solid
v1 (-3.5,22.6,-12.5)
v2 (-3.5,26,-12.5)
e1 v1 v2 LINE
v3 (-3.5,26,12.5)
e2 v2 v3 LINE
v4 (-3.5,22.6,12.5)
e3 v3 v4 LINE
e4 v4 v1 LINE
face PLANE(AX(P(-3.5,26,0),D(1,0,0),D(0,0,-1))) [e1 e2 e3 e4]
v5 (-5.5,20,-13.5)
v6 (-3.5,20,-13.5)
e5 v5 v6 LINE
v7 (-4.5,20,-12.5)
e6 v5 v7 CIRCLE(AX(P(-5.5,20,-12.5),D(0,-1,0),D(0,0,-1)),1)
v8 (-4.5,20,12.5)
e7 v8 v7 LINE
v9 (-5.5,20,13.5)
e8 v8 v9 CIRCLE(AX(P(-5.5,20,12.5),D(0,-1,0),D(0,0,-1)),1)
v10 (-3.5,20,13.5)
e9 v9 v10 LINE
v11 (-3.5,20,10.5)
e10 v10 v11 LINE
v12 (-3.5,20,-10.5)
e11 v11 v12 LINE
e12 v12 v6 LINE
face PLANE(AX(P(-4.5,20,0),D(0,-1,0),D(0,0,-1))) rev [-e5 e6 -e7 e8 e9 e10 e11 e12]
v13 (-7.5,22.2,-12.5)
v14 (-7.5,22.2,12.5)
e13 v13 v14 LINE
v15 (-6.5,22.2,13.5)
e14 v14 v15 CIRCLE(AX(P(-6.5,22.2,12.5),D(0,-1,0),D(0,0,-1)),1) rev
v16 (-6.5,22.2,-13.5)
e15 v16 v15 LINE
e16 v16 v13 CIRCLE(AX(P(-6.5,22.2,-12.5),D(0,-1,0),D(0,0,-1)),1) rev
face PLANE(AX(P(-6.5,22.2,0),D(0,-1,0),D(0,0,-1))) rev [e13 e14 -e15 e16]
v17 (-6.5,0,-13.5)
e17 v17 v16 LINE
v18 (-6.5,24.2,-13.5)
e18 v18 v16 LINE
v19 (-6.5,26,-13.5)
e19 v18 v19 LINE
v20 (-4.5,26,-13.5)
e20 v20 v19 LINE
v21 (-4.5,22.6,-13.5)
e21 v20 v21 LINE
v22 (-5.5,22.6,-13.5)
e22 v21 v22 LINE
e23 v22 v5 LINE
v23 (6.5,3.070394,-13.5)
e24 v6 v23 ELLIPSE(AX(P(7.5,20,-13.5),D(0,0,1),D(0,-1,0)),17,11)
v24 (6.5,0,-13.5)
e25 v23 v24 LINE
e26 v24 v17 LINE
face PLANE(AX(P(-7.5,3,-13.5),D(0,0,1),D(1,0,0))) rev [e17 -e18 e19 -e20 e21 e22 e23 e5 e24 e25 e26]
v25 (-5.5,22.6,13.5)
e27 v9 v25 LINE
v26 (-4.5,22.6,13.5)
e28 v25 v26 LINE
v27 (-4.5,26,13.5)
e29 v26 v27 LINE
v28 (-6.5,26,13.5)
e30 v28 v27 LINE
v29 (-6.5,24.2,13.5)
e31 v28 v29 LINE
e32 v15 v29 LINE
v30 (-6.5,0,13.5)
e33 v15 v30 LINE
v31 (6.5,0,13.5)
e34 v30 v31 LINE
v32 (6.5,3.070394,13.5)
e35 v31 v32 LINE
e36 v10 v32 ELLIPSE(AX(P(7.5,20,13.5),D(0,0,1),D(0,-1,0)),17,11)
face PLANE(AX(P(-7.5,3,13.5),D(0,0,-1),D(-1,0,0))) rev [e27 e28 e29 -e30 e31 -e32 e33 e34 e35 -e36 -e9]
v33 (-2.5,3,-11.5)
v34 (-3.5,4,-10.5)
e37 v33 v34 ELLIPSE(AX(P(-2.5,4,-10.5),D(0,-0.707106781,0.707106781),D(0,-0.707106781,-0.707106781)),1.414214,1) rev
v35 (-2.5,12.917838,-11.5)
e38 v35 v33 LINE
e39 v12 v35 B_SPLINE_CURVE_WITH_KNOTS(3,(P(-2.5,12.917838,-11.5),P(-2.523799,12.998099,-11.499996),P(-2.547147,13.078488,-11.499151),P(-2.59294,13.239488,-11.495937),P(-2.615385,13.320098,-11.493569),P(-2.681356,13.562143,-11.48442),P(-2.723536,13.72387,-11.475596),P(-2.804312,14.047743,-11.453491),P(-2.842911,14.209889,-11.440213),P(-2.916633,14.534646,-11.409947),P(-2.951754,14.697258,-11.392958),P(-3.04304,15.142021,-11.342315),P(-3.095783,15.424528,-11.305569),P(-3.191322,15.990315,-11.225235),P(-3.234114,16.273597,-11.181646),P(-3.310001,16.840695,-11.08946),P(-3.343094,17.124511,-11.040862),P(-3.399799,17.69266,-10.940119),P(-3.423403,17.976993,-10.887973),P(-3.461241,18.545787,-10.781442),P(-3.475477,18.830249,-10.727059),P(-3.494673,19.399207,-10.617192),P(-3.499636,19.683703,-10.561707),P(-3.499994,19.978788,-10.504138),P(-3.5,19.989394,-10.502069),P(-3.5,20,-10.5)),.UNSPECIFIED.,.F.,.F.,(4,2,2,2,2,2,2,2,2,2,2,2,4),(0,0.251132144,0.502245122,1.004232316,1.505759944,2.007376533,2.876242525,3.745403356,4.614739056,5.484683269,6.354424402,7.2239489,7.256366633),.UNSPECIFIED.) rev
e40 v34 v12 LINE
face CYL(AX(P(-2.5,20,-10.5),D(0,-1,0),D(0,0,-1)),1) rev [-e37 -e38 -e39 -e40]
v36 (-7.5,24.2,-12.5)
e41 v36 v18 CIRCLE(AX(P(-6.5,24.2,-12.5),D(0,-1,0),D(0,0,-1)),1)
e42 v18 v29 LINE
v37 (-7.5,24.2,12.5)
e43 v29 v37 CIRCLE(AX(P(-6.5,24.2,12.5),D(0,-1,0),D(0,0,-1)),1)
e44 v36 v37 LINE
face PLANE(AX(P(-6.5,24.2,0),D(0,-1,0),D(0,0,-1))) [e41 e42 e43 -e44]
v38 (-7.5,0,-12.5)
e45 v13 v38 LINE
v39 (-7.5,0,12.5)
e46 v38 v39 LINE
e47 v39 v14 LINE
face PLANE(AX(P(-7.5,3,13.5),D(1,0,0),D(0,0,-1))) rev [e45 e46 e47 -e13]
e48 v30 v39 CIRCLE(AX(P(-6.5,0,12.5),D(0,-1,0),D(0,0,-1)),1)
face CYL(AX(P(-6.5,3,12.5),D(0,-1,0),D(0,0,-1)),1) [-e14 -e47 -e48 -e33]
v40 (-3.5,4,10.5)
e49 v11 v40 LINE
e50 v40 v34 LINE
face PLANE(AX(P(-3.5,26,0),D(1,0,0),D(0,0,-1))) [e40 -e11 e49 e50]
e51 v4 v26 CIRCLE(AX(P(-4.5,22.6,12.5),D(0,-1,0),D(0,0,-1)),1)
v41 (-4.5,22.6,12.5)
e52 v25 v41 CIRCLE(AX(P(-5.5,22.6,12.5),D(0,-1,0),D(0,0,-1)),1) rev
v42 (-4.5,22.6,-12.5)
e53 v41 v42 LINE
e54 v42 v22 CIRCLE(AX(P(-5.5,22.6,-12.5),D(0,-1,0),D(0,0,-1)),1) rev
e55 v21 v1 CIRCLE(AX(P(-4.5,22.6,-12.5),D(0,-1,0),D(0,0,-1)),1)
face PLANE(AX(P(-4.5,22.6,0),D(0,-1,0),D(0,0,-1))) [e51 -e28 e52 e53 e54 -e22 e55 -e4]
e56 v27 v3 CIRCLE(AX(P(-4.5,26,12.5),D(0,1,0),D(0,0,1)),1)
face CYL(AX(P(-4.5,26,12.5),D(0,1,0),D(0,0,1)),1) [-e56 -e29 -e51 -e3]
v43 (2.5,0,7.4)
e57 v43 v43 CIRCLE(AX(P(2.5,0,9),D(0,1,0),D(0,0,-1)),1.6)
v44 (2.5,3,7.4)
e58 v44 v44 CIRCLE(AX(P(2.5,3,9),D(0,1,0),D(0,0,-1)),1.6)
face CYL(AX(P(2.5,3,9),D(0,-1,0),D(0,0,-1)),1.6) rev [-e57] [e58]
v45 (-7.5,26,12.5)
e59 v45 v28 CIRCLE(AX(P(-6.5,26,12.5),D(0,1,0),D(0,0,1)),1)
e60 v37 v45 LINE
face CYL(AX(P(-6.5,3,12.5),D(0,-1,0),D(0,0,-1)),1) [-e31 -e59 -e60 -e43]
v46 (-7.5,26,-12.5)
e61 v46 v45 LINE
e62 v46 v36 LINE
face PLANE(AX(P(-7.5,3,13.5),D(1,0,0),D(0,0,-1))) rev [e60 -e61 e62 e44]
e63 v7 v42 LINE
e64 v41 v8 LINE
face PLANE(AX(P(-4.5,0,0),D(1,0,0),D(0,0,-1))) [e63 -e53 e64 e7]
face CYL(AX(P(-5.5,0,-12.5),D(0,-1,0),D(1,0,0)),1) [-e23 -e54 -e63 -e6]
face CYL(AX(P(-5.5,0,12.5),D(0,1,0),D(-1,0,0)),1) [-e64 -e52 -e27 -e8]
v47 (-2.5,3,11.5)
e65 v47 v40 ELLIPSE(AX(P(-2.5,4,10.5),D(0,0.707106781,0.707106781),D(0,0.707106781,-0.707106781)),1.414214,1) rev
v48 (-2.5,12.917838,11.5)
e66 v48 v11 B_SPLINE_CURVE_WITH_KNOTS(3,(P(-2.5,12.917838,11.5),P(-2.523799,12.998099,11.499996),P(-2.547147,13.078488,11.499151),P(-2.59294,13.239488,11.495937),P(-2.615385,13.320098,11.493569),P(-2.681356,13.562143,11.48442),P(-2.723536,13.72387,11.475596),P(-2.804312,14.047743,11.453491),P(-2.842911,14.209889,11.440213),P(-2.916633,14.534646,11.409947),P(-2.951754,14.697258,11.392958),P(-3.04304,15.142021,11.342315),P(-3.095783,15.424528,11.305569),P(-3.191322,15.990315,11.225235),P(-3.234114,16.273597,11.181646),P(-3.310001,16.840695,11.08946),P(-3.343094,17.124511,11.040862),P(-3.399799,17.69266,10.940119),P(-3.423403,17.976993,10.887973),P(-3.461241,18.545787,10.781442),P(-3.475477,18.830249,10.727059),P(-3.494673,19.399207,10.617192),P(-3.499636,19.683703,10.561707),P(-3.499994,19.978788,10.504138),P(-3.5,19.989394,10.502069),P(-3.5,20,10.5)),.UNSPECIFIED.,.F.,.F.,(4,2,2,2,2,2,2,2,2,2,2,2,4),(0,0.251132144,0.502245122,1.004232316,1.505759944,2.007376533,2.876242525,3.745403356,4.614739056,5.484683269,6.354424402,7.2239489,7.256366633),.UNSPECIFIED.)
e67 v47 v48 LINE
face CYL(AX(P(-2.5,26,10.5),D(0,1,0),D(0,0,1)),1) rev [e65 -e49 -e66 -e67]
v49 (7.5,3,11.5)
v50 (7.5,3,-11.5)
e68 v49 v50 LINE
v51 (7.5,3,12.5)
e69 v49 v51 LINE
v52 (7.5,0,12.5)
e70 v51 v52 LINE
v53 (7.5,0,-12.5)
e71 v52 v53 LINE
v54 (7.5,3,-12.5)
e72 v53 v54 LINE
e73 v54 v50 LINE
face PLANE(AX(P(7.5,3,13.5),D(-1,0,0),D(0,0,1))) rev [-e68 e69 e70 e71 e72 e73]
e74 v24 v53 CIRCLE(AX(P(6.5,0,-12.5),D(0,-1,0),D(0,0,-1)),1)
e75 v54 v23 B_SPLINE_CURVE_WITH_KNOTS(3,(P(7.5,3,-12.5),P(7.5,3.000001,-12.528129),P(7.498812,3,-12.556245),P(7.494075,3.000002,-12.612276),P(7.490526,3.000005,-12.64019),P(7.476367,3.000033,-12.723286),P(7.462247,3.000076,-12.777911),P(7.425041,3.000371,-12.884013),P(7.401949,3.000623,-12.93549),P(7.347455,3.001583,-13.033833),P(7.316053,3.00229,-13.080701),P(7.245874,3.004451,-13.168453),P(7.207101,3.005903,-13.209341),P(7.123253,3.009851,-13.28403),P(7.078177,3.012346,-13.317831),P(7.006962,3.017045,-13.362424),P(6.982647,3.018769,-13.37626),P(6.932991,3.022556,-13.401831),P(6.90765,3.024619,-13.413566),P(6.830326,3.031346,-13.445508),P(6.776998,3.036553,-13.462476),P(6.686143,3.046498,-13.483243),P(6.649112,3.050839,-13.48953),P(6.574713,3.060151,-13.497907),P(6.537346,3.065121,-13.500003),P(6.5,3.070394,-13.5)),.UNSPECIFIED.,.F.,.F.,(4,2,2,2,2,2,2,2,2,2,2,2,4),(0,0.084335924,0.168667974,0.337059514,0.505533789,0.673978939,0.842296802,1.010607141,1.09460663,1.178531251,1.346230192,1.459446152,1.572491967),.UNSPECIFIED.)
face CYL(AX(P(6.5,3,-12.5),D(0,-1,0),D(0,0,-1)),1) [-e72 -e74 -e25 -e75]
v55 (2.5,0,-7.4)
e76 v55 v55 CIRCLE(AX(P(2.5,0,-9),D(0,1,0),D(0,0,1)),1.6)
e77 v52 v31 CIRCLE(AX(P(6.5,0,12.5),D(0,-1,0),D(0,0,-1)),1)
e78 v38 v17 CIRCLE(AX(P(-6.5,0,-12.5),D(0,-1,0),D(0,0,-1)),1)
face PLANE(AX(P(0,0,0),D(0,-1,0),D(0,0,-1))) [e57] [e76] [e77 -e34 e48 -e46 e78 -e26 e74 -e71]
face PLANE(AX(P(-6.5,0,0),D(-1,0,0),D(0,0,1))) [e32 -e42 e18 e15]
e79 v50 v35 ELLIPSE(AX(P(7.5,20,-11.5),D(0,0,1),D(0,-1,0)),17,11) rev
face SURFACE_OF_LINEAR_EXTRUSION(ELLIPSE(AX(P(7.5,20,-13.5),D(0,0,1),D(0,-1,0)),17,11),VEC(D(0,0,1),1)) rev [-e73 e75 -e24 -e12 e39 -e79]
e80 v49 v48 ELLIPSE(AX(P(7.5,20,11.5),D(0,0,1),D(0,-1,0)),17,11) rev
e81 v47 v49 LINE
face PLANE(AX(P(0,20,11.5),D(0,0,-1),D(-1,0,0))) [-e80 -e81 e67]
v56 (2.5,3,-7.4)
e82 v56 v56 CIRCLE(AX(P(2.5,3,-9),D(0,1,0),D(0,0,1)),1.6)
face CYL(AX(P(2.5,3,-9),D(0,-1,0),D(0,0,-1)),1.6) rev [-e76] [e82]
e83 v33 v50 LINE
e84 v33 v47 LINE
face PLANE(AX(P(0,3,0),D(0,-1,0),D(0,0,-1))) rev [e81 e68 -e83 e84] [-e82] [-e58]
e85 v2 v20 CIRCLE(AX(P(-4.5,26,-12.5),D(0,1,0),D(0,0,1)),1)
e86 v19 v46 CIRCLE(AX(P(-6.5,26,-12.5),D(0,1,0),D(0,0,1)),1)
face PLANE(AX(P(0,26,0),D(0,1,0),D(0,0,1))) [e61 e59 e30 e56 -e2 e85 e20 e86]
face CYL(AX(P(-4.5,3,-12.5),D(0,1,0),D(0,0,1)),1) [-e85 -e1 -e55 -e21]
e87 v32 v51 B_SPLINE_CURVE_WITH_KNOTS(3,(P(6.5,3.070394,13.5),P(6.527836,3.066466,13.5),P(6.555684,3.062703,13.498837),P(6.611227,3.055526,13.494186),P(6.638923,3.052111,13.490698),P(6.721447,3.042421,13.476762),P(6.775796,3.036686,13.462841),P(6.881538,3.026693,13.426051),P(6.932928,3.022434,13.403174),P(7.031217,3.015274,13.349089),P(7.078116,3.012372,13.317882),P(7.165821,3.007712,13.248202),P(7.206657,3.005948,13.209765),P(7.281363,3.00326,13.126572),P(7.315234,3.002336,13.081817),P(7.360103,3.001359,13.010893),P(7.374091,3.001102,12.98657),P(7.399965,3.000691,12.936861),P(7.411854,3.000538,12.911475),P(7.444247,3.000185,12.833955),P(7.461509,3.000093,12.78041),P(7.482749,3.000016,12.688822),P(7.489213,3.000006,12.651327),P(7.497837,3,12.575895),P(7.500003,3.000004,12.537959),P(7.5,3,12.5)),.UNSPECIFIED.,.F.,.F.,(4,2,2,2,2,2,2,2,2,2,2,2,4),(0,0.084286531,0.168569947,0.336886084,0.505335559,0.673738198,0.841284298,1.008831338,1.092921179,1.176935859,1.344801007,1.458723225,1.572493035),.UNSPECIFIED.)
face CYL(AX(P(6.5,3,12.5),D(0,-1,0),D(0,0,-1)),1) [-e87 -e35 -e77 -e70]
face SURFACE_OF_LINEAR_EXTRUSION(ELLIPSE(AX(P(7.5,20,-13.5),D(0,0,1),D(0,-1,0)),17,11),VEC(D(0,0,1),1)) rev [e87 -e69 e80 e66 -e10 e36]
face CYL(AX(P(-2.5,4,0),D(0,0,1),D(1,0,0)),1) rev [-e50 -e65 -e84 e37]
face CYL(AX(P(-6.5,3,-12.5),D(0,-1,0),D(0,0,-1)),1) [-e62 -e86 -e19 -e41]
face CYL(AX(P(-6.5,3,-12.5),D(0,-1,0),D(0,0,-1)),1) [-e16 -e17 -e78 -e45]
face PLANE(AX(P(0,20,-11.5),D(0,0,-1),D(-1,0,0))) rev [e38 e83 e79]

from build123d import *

# Parameters (mm, degrees)
SKETCH1_W               = 15
SKETCH1_H               = 27
SKETCH1_R               = 1.6
BOSS_EXTRUDE1_DEPTH     = 3
SKETCH2_W               = 4
SKETCH2_H               = 27
BOSS_EXTRUDE2_DEPTH     = 23
SKETCH3_W               = 27
SKETCH3_H               = 2
CUT_EXTRUDE1_DEPTH      = 1
SKETCH4_W               = 27
SKETCH4_H               = 2.6
CUT_EXTRUDE2_DEPTH      = 1
SKETCH5_W               = 11
SKETCH5_H               = 2
BOSS_EXTRUDE3_DEPTH     = 17
CUT_EXTRUDE3_DEPTH      = 37.84087404
CUT_EXTRUDE3_DEPTH_BACK = 37.84087404
SKETCH7_RX              = 17
SKETCH7_RY              = 11
FILLET2_R               = 1
FILLET3_START           = -11.5
FILLET3_DEPTH           = 23
FILLET3_START_2         = 2
FILLET3_2_DEPTH         = 18
FILLET3_3_DEPTH         = 23


with BuildPart() as part:
    # Sketch1 → Boss-Extrude1 (new body)
    with BuildSketch(Plane(origin=(0, 0, 0), x_dir=(1, 0, 0), z_dir=(0, 1, 0))):
        Rectangle(SKETCH1_W, SKETCH1_H)
        with Locations(Location((2.5, 9, 0), (0, 0, 270))):
            Circle(SKETCH1_R, mode=Mode.SUBTRACT)
        with Locations(Location((2.5, -9, 0), (0, 0, 90))):
            Circle(SKETCH1_R, mode=Mode.SUBTRACT)
    extrude(amount=BOSS_EXTRUDE1_DEPTH)

    # Sketch2 → Boss-Extrude2 (add)
    with BuildSketch(Plane(origin=(0, 3, 0), x_dir=(1, 0, 0), z_dir=(0, 1, 0))):
        with Locations((-5.5, 0)):
            Rectangle(SKETCH2_W, SKETCH2_H)
    extrude(amount=BOSS_EXTRUDE2_DEPTH)

    # Sketch3 → Cut-Extrude1 (cut)
    with BuildSketch(Plane.ZY.offset(7.5)):
        with Locations((0, 23.2)):
            Rectangle(SKETCH3_W, SKETCH3_H)
    extrude(amount=-CUT_EXTRUDE1_DEPTH, mode=Mode.SUBTRACT)

    # Sketch4 → Cut-Extrude2 (cut)
    with BuildSketch(Plane(origin=(-3.5, 0, 0), x_dir=(0, 0, -1), z_dir=(1, 0, 0))):
        with Locations((0, 21.3)):
            Rectangle(SKETCH4_W, SKETCH4_H)
    extrude(amount=-CUT_EXTRUDE2_DEPTH, mode=Mode.SUBTRACT)

    # Sketch5 → Boss-Extrude3 (add)
    with BuildSketch(Plane(origin=(0, 3, 0), x_dir=(1, 0, 0), z_dir=(0, 1, 0))):
        with Locations((2, 12.5)):
            Rectangle(SKETCH5_W, SKETCH5_H)
        with Locations((2, -12.5)):
            Rectangle(SKETCH5_W, SKETCH5_H)
    extrude(amount=BOSS_EXTRUDE3_DEPTH)

    # Sketch7 → Cut-Extrude3 (cut, two sides: drawn at the far end of the back side and taken through both)
    with BuildSketch(Plane.XY.offset(-11.5).offset(-CUT_EXTRUDE3_DEPTH_BACK)):
        with Locations(Location((7.5, 20), (0, 0, 90))):
            Ellipse(SKETCH7_RX, SKETCH7_RY)
    extrude(amount=CUT_EXTRUDE3_DEPTH + CUT_EXTRUDE3_DEPTH_BACK, mode=Mode.SUBTRACT)

    # Fillet2
    fillet2_edges = [part.edges().sort_by_distance(p)[0] for p in [
        (-7.5, 25.1, 13.5),
        (-7.5, 11.1, 13.5),
        (7.5, 1.5, 13.5),
        (-4.5, 21.3, 13.5),
        (-3.5, 24.3, 13.5),
        (-7.5, 25.1, -13.5),
        (-7.5, 11.1, -13.5),
        (7.5, 1.5, -13.5),
        (-4.5, 21.3, -13.5),
        (-3.5, 24.3, -13.5),
    ]]
    fillet(fillet2_edges, radius=FILLET2_R - 0.0001)  # a hair under: the kernel refuses the full size

    # Fillet3: read off the stored shape, not the designer's step
    # Fillet3 outline → Fillet3 (add)
    with BuildSketch(Plane.XY.offset(FILLET3_START)):
        with BuildLine():
            ThreePointArc((-2.5, 3), (-3.207106781, 3.292893219), (-3.5, 4))
            Line((-3.5, 4), (-3.5, 3))
            Line((-3.5, 3), (-2.5, 3))
        make_face()
    extrude(amount=FILLET3_DEPTH)

    # Fillet3 2 outline → Fillet3 2 (add)
    with BuildSketch(Plane(origin=(0, 0, 0), x_dir=(1, 0, 0), z_dir=(0, 1, 0)).offset(FILLET3_START_2)):
        with BuildLine():
            Line((-3.5, 11.5), (-3.5, 10.5))
            ThreePointArc((-3.5, 10.5), (-3.207106781, 11.207106781), (-2.5, 11.5))
            Line((-2.5, 11.5), (-3.5, 11.5))
        make_face()
        with BuildLine():
            ThreePointArc((-2.5, -11.5), (-3.207106781, -11.207106781), (-3.5, -10.5))
            Line((-3.5, -10.5), (-3.5, -11.5))
            Line((-3.5, -11.5), (-2.5, -11.5))
        make_face()
    extrude(amount=FILLET3_2_DEPTH)

    # Fillet3 3 outline → Fillet3 3 (cut)
    with BuildSketch(Plane.XY.offset(FILLET3_START)):
        with BuildLine():
            Line((-2.5, 20), (-3.5, 20))
            add(Edge.make_bspline(
                [(-3.5, 20), (-3.5, 16.290295866), (-2.5, 12.917837562)],
                knots=[4.71238898, 4.71238898, 4.71238898, 5.142088647, 5.142088647, 5.142088647], degree=2, weights=[1, 0.977008421, 1]))
            Line((-2.5, 12.917837562), (-2.5, 20))
        make_face()
    extrude(amount=FILLET3_3_DEPTH, mode=Mode.SUBTRACT)


solid = part.part
